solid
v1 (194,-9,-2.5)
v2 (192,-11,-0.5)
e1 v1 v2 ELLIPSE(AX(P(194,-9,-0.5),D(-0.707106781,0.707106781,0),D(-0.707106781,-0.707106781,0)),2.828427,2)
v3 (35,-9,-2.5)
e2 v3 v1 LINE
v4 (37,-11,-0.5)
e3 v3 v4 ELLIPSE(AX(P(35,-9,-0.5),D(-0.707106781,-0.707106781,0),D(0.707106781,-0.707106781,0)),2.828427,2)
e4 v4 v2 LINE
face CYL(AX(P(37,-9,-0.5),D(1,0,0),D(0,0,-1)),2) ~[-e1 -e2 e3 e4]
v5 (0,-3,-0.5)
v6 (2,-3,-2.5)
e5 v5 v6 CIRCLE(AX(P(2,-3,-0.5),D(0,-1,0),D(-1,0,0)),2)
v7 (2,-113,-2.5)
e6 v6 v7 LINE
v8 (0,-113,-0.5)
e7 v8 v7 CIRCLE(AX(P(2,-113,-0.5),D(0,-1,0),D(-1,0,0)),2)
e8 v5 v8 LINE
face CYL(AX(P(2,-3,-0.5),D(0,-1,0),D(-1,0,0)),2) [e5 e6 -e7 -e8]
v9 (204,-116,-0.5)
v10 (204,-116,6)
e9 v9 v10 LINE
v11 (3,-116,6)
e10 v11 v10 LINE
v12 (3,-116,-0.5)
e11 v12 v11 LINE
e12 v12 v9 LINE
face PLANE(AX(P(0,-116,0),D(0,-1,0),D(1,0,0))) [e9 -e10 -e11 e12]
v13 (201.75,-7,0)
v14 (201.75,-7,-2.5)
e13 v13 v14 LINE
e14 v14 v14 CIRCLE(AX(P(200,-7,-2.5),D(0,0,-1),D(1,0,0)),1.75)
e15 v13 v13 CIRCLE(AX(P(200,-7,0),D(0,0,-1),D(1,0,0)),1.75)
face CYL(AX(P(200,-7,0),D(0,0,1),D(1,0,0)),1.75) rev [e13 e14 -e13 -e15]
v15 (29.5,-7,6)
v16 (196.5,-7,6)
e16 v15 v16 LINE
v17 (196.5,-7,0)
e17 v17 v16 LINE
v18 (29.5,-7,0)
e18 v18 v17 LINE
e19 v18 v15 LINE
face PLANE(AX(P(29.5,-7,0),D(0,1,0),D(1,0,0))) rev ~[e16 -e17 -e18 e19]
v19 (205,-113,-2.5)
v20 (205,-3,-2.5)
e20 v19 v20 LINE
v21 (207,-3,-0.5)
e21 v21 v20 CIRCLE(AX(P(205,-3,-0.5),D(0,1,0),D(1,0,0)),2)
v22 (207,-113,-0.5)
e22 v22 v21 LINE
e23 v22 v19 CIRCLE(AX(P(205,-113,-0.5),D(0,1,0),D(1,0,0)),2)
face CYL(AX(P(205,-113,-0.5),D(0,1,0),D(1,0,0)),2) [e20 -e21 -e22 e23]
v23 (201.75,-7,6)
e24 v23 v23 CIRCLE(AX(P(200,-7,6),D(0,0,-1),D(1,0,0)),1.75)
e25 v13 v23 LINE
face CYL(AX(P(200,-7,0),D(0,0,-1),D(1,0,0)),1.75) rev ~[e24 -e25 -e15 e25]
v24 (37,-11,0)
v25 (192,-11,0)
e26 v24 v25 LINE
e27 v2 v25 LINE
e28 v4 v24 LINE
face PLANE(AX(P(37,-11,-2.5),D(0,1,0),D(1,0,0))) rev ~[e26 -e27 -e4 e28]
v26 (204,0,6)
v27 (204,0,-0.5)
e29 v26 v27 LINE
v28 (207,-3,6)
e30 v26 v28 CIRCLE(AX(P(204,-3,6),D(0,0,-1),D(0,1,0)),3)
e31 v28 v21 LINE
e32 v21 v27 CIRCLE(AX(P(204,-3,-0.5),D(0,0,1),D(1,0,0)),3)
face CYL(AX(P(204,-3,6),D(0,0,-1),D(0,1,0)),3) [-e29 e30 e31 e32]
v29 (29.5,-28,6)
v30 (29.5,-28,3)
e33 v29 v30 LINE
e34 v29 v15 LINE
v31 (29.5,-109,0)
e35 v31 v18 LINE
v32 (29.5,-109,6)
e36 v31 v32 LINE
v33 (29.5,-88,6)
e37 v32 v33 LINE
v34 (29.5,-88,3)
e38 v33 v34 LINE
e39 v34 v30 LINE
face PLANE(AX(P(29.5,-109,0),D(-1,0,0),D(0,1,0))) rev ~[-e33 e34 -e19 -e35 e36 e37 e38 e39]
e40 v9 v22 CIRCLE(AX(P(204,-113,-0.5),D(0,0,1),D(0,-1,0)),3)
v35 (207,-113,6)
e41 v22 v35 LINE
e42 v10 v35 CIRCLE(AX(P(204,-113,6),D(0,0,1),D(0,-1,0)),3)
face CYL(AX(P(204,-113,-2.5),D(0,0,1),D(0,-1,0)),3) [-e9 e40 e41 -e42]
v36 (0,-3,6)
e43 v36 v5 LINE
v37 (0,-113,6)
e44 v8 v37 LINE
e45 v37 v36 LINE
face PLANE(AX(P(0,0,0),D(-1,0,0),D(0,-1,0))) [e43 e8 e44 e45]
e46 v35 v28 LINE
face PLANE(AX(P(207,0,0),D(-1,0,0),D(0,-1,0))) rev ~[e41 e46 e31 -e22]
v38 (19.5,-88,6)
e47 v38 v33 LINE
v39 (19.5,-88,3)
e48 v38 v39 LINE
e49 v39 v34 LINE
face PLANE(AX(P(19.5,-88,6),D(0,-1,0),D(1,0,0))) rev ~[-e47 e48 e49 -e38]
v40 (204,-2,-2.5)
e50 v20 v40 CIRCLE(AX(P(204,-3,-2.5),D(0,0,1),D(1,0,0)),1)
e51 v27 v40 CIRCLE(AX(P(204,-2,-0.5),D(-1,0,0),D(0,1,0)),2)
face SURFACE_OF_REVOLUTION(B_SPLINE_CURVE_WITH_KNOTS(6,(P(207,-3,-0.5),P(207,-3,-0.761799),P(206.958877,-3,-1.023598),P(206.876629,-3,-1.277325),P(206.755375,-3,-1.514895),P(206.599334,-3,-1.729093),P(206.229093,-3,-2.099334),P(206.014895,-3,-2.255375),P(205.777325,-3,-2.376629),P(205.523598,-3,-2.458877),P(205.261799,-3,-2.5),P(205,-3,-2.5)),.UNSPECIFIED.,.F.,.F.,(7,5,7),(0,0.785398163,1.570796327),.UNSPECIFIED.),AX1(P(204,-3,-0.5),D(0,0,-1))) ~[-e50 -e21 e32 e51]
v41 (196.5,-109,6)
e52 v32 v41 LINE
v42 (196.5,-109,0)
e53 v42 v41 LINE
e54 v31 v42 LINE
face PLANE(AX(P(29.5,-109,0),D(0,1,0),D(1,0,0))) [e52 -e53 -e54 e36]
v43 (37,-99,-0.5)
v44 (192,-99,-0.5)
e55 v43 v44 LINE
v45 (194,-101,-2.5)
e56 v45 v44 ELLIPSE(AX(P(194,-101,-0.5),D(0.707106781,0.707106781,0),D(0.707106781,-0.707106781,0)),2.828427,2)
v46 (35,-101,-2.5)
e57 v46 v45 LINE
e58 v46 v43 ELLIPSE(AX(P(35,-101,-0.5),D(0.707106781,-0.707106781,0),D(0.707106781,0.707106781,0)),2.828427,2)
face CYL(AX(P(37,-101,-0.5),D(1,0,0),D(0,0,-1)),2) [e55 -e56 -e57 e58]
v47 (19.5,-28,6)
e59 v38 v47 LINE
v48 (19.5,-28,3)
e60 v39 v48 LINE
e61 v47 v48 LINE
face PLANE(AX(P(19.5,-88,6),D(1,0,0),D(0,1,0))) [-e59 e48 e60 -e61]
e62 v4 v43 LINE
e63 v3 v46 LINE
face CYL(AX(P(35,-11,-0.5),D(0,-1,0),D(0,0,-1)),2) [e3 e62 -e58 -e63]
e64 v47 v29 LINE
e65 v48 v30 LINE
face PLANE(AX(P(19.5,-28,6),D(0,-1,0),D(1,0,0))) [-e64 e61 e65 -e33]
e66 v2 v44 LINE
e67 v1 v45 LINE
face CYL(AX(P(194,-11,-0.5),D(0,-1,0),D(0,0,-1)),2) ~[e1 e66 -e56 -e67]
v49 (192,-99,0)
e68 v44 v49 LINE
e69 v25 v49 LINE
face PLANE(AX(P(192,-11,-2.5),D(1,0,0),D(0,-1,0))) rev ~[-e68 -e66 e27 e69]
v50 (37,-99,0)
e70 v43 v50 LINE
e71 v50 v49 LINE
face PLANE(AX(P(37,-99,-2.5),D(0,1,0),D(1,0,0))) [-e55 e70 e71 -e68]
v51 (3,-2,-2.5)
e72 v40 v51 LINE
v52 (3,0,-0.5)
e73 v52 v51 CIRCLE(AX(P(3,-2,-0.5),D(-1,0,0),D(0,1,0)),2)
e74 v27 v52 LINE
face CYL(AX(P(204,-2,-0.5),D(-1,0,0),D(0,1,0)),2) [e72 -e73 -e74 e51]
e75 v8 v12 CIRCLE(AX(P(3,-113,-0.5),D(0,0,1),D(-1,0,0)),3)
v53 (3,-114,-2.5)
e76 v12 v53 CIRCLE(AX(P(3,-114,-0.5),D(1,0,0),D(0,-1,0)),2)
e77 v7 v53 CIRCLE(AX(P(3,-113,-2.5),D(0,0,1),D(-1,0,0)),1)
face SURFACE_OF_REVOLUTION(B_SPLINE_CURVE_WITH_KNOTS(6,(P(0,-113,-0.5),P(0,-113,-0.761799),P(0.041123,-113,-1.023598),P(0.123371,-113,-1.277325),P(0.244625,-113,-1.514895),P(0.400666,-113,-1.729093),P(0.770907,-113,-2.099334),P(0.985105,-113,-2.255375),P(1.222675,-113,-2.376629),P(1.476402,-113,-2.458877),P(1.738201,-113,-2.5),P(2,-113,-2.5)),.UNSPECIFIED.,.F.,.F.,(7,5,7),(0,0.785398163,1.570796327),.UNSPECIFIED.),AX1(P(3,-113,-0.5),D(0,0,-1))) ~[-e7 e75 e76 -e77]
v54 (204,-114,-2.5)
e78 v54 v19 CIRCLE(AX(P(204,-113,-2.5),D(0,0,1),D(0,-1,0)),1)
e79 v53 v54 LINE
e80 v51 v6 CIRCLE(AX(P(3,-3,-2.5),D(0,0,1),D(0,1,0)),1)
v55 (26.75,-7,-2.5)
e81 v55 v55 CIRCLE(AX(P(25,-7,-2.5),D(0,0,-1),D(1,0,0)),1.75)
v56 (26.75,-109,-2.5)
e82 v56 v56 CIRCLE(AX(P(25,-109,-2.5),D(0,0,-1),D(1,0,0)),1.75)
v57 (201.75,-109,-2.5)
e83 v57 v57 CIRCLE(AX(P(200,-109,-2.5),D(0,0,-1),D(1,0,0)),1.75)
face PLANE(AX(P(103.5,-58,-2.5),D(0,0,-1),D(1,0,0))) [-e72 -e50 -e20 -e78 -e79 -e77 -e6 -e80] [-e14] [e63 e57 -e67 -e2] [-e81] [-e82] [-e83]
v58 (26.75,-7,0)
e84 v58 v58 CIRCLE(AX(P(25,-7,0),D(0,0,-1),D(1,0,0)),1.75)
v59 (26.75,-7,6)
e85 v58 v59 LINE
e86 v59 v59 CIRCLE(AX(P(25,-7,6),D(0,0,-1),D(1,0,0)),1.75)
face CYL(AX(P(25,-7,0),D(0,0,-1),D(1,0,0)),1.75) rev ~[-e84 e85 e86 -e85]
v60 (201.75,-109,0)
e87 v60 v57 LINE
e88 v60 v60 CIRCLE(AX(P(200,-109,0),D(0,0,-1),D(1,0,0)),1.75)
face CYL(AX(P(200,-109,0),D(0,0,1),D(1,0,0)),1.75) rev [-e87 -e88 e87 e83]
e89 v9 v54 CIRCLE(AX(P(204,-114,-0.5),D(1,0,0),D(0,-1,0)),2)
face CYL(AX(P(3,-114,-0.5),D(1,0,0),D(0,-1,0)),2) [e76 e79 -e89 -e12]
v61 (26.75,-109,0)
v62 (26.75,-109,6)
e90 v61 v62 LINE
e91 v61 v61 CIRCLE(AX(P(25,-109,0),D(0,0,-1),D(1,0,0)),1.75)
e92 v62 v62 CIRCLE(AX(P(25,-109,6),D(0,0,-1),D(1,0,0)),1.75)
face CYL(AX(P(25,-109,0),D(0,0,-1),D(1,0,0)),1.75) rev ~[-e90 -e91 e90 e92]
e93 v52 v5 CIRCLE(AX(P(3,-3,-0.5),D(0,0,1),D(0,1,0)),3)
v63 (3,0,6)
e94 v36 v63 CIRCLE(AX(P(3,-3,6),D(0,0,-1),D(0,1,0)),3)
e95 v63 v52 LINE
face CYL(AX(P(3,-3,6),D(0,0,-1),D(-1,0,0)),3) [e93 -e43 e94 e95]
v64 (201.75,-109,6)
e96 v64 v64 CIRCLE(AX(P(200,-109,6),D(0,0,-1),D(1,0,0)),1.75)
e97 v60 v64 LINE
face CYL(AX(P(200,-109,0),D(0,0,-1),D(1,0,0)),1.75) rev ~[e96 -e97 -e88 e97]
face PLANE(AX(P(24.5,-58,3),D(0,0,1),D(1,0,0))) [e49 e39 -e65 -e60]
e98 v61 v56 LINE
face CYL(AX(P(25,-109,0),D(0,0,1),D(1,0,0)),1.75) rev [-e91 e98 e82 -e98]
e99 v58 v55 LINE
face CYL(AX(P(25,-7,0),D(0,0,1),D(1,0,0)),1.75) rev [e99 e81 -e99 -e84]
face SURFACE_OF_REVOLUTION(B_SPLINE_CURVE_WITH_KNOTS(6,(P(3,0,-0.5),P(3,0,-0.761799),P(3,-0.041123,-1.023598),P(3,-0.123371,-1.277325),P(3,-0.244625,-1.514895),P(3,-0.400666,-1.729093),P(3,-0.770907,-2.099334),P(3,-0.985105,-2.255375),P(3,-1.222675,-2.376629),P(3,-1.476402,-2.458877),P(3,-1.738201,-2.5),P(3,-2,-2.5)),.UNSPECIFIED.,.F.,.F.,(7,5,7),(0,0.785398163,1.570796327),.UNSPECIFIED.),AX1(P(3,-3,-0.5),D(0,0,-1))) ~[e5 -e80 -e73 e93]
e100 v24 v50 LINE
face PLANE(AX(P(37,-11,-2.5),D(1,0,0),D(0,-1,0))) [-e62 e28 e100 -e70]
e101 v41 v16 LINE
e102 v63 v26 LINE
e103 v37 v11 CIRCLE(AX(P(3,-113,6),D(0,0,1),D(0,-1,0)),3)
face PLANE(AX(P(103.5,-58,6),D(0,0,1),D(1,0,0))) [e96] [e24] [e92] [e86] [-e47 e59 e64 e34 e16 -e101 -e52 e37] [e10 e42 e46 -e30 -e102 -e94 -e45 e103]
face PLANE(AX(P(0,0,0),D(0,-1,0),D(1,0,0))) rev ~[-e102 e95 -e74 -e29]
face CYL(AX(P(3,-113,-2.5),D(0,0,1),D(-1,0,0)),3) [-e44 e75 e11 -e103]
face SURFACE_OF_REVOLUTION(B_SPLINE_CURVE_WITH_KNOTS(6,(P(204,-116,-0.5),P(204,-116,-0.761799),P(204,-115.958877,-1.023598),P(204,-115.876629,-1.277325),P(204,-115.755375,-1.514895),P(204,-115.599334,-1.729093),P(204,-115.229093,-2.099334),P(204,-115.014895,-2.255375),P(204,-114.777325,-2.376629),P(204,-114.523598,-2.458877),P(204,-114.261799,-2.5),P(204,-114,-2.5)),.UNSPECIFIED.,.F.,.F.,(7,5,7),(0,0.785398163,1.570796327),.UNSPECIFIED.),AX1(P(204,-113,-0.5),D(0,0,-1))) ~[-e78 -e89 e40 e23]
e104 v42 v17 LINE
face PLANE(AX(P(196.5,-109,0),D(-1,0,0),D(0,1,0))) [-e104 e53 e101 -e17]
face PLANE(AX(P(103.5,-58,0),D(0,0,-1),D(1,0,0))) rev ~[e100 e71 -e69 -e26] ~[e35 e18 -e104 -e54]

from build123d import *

# Parameters (mm, degrees)
F0_W      = 207
F0_H      = 116
F1_DEPTH  = 6
F2_W      = 167
F2_H      = 102
F3_DEPTH  = 6
F4_R      = 1.75
F5_DEPTH  = 25
F6_W      = 10
F6_H      = 60
F7_DEPTH  = 3
F8_W      = 207
F8_H      = 116
F8_R      = 1.75
F8_W_2    = 167
F8_H_2    = 102
F9_DEPTH  = 2.5
F10_W     = 155
F10_H     = 88
F11_DEPTH = 25
F13_R     = 3
F14_R     = 2


with BuildPart() as f1:
    # F0 (on Top) → F1 (new body)
    with BuildSketch(Plane.XY):
        with Locations((103.5, -58)):
            Rectangle(F0_W, F0_H)
    extrude(amount=F1_DEPTH)

    # F2 (on face) → F3 (cut)
    with BuildSketch(Plane.XY):
        with Locations((113, -58)):
            Rectangle(F2_W, F2_H)
    extrude(amount=F3_DEPTH, mode=Mode.SUBTRACT)

    # F4 (on face) → F5 (cut)
    with BuildSketch(Plane(origin=(0, 0, 0), x_dir=(1, 0, 0), z_dir=(0, 0, -1))):
        with Locations((200, 7)):
            Circle(F4_R)
        with Locations((200, 109)):
            Circle(F4_R)
        with Locations((25, 109)):
            Circle(F4_R)
        with Locations((25, 7)):
            Circle(F4_R)
    extrude(amount=-F5_DEPTH, mode=Mode.SUBTRACT)

    # F6 (on face) → F7 (cut)
    with BuildSketch(Plane.XY.offset(6)):
        with Locations((24.5, -58)):
            Rectangle(F6_W, F6_H)
    extrude(amount=-F7_DEPTH, mode=Mode.SUBTRACT)

    # F8 (on face) → F9 (join)
    with BuildSketch(Plane(origin=(0, 0, 0), x_dir=(1, 0, 0), z_dir=(0, 0, -1))):
        with Locations((103.5, 58)):
            Rectangle(F8_W, F8_H)
        with Locations((25, 7)):
            Circle(F8_R, mode=Mode.SUBTRACT)
        with Locations((200, 7)):
            Circle(F8_R, mode=Mode.SUBTRACT)
        with Locations((25, 109)):
            Circle(F8_R, mode=Mode.SUBTRACT)
        with Locations((113, 58)):
            Rectangle(F8_W_2, F8_H_2, mode=Mode.SUBTRACT)
        with Locations((200, 109)):
            Circle(F8_R, mode=Mode.SUBTRACT)
        with Locations((113, 58)):
            Rectangle(F8_W_2, F8_H_2)
    extrude(amount=F9_DEPTH)

    # F10 (on face) → F11 (cut)
    with BuildSketch(Plane(origin=(0, 0, -2.5), x_dir=(1, 0, 0), z_dir=(0, 0, -1))):
        with Locations((114.5, 55)):
            Rectangle(F10_W, F10_H)
    extrude(amount=-F11_DEPTH, mode=Mode.SUBTRACT)

    # F13
    f13_edges = [f1.edges().sort_by_distance(p)[0] for p in [
        (207, 0, 1.75),
        (0, 0, 1.75),
        (207, -116, 1.75),
        (0, -116, 1.75),
    ]]
    fillet(f13_edges, radius=F13_R)

    # F14
    f14_edges = [f1.edges().sort_by_distance(p)[0] for p in [
        (0, -58, -2.5),
        (114.5, -99, -2.5),
        (37, -55, -2.5),
        (192, -55, -2.5),
        (114.5, -11, -2.5),
        (103.5, 0, -2.5),
        (206.12132, -0.87868, -2.5),
        (0.87868, -0.87868, -2.5),
        (207, -58, -2.5),
        (0.87868, -115.12132, -2.5),
        (206.12132, -115.12132, -2.5),
        (103.5, -116, -2.5),
    ]]
    fillet(f14_edges, radius=F14_R)


solid = f1.part
